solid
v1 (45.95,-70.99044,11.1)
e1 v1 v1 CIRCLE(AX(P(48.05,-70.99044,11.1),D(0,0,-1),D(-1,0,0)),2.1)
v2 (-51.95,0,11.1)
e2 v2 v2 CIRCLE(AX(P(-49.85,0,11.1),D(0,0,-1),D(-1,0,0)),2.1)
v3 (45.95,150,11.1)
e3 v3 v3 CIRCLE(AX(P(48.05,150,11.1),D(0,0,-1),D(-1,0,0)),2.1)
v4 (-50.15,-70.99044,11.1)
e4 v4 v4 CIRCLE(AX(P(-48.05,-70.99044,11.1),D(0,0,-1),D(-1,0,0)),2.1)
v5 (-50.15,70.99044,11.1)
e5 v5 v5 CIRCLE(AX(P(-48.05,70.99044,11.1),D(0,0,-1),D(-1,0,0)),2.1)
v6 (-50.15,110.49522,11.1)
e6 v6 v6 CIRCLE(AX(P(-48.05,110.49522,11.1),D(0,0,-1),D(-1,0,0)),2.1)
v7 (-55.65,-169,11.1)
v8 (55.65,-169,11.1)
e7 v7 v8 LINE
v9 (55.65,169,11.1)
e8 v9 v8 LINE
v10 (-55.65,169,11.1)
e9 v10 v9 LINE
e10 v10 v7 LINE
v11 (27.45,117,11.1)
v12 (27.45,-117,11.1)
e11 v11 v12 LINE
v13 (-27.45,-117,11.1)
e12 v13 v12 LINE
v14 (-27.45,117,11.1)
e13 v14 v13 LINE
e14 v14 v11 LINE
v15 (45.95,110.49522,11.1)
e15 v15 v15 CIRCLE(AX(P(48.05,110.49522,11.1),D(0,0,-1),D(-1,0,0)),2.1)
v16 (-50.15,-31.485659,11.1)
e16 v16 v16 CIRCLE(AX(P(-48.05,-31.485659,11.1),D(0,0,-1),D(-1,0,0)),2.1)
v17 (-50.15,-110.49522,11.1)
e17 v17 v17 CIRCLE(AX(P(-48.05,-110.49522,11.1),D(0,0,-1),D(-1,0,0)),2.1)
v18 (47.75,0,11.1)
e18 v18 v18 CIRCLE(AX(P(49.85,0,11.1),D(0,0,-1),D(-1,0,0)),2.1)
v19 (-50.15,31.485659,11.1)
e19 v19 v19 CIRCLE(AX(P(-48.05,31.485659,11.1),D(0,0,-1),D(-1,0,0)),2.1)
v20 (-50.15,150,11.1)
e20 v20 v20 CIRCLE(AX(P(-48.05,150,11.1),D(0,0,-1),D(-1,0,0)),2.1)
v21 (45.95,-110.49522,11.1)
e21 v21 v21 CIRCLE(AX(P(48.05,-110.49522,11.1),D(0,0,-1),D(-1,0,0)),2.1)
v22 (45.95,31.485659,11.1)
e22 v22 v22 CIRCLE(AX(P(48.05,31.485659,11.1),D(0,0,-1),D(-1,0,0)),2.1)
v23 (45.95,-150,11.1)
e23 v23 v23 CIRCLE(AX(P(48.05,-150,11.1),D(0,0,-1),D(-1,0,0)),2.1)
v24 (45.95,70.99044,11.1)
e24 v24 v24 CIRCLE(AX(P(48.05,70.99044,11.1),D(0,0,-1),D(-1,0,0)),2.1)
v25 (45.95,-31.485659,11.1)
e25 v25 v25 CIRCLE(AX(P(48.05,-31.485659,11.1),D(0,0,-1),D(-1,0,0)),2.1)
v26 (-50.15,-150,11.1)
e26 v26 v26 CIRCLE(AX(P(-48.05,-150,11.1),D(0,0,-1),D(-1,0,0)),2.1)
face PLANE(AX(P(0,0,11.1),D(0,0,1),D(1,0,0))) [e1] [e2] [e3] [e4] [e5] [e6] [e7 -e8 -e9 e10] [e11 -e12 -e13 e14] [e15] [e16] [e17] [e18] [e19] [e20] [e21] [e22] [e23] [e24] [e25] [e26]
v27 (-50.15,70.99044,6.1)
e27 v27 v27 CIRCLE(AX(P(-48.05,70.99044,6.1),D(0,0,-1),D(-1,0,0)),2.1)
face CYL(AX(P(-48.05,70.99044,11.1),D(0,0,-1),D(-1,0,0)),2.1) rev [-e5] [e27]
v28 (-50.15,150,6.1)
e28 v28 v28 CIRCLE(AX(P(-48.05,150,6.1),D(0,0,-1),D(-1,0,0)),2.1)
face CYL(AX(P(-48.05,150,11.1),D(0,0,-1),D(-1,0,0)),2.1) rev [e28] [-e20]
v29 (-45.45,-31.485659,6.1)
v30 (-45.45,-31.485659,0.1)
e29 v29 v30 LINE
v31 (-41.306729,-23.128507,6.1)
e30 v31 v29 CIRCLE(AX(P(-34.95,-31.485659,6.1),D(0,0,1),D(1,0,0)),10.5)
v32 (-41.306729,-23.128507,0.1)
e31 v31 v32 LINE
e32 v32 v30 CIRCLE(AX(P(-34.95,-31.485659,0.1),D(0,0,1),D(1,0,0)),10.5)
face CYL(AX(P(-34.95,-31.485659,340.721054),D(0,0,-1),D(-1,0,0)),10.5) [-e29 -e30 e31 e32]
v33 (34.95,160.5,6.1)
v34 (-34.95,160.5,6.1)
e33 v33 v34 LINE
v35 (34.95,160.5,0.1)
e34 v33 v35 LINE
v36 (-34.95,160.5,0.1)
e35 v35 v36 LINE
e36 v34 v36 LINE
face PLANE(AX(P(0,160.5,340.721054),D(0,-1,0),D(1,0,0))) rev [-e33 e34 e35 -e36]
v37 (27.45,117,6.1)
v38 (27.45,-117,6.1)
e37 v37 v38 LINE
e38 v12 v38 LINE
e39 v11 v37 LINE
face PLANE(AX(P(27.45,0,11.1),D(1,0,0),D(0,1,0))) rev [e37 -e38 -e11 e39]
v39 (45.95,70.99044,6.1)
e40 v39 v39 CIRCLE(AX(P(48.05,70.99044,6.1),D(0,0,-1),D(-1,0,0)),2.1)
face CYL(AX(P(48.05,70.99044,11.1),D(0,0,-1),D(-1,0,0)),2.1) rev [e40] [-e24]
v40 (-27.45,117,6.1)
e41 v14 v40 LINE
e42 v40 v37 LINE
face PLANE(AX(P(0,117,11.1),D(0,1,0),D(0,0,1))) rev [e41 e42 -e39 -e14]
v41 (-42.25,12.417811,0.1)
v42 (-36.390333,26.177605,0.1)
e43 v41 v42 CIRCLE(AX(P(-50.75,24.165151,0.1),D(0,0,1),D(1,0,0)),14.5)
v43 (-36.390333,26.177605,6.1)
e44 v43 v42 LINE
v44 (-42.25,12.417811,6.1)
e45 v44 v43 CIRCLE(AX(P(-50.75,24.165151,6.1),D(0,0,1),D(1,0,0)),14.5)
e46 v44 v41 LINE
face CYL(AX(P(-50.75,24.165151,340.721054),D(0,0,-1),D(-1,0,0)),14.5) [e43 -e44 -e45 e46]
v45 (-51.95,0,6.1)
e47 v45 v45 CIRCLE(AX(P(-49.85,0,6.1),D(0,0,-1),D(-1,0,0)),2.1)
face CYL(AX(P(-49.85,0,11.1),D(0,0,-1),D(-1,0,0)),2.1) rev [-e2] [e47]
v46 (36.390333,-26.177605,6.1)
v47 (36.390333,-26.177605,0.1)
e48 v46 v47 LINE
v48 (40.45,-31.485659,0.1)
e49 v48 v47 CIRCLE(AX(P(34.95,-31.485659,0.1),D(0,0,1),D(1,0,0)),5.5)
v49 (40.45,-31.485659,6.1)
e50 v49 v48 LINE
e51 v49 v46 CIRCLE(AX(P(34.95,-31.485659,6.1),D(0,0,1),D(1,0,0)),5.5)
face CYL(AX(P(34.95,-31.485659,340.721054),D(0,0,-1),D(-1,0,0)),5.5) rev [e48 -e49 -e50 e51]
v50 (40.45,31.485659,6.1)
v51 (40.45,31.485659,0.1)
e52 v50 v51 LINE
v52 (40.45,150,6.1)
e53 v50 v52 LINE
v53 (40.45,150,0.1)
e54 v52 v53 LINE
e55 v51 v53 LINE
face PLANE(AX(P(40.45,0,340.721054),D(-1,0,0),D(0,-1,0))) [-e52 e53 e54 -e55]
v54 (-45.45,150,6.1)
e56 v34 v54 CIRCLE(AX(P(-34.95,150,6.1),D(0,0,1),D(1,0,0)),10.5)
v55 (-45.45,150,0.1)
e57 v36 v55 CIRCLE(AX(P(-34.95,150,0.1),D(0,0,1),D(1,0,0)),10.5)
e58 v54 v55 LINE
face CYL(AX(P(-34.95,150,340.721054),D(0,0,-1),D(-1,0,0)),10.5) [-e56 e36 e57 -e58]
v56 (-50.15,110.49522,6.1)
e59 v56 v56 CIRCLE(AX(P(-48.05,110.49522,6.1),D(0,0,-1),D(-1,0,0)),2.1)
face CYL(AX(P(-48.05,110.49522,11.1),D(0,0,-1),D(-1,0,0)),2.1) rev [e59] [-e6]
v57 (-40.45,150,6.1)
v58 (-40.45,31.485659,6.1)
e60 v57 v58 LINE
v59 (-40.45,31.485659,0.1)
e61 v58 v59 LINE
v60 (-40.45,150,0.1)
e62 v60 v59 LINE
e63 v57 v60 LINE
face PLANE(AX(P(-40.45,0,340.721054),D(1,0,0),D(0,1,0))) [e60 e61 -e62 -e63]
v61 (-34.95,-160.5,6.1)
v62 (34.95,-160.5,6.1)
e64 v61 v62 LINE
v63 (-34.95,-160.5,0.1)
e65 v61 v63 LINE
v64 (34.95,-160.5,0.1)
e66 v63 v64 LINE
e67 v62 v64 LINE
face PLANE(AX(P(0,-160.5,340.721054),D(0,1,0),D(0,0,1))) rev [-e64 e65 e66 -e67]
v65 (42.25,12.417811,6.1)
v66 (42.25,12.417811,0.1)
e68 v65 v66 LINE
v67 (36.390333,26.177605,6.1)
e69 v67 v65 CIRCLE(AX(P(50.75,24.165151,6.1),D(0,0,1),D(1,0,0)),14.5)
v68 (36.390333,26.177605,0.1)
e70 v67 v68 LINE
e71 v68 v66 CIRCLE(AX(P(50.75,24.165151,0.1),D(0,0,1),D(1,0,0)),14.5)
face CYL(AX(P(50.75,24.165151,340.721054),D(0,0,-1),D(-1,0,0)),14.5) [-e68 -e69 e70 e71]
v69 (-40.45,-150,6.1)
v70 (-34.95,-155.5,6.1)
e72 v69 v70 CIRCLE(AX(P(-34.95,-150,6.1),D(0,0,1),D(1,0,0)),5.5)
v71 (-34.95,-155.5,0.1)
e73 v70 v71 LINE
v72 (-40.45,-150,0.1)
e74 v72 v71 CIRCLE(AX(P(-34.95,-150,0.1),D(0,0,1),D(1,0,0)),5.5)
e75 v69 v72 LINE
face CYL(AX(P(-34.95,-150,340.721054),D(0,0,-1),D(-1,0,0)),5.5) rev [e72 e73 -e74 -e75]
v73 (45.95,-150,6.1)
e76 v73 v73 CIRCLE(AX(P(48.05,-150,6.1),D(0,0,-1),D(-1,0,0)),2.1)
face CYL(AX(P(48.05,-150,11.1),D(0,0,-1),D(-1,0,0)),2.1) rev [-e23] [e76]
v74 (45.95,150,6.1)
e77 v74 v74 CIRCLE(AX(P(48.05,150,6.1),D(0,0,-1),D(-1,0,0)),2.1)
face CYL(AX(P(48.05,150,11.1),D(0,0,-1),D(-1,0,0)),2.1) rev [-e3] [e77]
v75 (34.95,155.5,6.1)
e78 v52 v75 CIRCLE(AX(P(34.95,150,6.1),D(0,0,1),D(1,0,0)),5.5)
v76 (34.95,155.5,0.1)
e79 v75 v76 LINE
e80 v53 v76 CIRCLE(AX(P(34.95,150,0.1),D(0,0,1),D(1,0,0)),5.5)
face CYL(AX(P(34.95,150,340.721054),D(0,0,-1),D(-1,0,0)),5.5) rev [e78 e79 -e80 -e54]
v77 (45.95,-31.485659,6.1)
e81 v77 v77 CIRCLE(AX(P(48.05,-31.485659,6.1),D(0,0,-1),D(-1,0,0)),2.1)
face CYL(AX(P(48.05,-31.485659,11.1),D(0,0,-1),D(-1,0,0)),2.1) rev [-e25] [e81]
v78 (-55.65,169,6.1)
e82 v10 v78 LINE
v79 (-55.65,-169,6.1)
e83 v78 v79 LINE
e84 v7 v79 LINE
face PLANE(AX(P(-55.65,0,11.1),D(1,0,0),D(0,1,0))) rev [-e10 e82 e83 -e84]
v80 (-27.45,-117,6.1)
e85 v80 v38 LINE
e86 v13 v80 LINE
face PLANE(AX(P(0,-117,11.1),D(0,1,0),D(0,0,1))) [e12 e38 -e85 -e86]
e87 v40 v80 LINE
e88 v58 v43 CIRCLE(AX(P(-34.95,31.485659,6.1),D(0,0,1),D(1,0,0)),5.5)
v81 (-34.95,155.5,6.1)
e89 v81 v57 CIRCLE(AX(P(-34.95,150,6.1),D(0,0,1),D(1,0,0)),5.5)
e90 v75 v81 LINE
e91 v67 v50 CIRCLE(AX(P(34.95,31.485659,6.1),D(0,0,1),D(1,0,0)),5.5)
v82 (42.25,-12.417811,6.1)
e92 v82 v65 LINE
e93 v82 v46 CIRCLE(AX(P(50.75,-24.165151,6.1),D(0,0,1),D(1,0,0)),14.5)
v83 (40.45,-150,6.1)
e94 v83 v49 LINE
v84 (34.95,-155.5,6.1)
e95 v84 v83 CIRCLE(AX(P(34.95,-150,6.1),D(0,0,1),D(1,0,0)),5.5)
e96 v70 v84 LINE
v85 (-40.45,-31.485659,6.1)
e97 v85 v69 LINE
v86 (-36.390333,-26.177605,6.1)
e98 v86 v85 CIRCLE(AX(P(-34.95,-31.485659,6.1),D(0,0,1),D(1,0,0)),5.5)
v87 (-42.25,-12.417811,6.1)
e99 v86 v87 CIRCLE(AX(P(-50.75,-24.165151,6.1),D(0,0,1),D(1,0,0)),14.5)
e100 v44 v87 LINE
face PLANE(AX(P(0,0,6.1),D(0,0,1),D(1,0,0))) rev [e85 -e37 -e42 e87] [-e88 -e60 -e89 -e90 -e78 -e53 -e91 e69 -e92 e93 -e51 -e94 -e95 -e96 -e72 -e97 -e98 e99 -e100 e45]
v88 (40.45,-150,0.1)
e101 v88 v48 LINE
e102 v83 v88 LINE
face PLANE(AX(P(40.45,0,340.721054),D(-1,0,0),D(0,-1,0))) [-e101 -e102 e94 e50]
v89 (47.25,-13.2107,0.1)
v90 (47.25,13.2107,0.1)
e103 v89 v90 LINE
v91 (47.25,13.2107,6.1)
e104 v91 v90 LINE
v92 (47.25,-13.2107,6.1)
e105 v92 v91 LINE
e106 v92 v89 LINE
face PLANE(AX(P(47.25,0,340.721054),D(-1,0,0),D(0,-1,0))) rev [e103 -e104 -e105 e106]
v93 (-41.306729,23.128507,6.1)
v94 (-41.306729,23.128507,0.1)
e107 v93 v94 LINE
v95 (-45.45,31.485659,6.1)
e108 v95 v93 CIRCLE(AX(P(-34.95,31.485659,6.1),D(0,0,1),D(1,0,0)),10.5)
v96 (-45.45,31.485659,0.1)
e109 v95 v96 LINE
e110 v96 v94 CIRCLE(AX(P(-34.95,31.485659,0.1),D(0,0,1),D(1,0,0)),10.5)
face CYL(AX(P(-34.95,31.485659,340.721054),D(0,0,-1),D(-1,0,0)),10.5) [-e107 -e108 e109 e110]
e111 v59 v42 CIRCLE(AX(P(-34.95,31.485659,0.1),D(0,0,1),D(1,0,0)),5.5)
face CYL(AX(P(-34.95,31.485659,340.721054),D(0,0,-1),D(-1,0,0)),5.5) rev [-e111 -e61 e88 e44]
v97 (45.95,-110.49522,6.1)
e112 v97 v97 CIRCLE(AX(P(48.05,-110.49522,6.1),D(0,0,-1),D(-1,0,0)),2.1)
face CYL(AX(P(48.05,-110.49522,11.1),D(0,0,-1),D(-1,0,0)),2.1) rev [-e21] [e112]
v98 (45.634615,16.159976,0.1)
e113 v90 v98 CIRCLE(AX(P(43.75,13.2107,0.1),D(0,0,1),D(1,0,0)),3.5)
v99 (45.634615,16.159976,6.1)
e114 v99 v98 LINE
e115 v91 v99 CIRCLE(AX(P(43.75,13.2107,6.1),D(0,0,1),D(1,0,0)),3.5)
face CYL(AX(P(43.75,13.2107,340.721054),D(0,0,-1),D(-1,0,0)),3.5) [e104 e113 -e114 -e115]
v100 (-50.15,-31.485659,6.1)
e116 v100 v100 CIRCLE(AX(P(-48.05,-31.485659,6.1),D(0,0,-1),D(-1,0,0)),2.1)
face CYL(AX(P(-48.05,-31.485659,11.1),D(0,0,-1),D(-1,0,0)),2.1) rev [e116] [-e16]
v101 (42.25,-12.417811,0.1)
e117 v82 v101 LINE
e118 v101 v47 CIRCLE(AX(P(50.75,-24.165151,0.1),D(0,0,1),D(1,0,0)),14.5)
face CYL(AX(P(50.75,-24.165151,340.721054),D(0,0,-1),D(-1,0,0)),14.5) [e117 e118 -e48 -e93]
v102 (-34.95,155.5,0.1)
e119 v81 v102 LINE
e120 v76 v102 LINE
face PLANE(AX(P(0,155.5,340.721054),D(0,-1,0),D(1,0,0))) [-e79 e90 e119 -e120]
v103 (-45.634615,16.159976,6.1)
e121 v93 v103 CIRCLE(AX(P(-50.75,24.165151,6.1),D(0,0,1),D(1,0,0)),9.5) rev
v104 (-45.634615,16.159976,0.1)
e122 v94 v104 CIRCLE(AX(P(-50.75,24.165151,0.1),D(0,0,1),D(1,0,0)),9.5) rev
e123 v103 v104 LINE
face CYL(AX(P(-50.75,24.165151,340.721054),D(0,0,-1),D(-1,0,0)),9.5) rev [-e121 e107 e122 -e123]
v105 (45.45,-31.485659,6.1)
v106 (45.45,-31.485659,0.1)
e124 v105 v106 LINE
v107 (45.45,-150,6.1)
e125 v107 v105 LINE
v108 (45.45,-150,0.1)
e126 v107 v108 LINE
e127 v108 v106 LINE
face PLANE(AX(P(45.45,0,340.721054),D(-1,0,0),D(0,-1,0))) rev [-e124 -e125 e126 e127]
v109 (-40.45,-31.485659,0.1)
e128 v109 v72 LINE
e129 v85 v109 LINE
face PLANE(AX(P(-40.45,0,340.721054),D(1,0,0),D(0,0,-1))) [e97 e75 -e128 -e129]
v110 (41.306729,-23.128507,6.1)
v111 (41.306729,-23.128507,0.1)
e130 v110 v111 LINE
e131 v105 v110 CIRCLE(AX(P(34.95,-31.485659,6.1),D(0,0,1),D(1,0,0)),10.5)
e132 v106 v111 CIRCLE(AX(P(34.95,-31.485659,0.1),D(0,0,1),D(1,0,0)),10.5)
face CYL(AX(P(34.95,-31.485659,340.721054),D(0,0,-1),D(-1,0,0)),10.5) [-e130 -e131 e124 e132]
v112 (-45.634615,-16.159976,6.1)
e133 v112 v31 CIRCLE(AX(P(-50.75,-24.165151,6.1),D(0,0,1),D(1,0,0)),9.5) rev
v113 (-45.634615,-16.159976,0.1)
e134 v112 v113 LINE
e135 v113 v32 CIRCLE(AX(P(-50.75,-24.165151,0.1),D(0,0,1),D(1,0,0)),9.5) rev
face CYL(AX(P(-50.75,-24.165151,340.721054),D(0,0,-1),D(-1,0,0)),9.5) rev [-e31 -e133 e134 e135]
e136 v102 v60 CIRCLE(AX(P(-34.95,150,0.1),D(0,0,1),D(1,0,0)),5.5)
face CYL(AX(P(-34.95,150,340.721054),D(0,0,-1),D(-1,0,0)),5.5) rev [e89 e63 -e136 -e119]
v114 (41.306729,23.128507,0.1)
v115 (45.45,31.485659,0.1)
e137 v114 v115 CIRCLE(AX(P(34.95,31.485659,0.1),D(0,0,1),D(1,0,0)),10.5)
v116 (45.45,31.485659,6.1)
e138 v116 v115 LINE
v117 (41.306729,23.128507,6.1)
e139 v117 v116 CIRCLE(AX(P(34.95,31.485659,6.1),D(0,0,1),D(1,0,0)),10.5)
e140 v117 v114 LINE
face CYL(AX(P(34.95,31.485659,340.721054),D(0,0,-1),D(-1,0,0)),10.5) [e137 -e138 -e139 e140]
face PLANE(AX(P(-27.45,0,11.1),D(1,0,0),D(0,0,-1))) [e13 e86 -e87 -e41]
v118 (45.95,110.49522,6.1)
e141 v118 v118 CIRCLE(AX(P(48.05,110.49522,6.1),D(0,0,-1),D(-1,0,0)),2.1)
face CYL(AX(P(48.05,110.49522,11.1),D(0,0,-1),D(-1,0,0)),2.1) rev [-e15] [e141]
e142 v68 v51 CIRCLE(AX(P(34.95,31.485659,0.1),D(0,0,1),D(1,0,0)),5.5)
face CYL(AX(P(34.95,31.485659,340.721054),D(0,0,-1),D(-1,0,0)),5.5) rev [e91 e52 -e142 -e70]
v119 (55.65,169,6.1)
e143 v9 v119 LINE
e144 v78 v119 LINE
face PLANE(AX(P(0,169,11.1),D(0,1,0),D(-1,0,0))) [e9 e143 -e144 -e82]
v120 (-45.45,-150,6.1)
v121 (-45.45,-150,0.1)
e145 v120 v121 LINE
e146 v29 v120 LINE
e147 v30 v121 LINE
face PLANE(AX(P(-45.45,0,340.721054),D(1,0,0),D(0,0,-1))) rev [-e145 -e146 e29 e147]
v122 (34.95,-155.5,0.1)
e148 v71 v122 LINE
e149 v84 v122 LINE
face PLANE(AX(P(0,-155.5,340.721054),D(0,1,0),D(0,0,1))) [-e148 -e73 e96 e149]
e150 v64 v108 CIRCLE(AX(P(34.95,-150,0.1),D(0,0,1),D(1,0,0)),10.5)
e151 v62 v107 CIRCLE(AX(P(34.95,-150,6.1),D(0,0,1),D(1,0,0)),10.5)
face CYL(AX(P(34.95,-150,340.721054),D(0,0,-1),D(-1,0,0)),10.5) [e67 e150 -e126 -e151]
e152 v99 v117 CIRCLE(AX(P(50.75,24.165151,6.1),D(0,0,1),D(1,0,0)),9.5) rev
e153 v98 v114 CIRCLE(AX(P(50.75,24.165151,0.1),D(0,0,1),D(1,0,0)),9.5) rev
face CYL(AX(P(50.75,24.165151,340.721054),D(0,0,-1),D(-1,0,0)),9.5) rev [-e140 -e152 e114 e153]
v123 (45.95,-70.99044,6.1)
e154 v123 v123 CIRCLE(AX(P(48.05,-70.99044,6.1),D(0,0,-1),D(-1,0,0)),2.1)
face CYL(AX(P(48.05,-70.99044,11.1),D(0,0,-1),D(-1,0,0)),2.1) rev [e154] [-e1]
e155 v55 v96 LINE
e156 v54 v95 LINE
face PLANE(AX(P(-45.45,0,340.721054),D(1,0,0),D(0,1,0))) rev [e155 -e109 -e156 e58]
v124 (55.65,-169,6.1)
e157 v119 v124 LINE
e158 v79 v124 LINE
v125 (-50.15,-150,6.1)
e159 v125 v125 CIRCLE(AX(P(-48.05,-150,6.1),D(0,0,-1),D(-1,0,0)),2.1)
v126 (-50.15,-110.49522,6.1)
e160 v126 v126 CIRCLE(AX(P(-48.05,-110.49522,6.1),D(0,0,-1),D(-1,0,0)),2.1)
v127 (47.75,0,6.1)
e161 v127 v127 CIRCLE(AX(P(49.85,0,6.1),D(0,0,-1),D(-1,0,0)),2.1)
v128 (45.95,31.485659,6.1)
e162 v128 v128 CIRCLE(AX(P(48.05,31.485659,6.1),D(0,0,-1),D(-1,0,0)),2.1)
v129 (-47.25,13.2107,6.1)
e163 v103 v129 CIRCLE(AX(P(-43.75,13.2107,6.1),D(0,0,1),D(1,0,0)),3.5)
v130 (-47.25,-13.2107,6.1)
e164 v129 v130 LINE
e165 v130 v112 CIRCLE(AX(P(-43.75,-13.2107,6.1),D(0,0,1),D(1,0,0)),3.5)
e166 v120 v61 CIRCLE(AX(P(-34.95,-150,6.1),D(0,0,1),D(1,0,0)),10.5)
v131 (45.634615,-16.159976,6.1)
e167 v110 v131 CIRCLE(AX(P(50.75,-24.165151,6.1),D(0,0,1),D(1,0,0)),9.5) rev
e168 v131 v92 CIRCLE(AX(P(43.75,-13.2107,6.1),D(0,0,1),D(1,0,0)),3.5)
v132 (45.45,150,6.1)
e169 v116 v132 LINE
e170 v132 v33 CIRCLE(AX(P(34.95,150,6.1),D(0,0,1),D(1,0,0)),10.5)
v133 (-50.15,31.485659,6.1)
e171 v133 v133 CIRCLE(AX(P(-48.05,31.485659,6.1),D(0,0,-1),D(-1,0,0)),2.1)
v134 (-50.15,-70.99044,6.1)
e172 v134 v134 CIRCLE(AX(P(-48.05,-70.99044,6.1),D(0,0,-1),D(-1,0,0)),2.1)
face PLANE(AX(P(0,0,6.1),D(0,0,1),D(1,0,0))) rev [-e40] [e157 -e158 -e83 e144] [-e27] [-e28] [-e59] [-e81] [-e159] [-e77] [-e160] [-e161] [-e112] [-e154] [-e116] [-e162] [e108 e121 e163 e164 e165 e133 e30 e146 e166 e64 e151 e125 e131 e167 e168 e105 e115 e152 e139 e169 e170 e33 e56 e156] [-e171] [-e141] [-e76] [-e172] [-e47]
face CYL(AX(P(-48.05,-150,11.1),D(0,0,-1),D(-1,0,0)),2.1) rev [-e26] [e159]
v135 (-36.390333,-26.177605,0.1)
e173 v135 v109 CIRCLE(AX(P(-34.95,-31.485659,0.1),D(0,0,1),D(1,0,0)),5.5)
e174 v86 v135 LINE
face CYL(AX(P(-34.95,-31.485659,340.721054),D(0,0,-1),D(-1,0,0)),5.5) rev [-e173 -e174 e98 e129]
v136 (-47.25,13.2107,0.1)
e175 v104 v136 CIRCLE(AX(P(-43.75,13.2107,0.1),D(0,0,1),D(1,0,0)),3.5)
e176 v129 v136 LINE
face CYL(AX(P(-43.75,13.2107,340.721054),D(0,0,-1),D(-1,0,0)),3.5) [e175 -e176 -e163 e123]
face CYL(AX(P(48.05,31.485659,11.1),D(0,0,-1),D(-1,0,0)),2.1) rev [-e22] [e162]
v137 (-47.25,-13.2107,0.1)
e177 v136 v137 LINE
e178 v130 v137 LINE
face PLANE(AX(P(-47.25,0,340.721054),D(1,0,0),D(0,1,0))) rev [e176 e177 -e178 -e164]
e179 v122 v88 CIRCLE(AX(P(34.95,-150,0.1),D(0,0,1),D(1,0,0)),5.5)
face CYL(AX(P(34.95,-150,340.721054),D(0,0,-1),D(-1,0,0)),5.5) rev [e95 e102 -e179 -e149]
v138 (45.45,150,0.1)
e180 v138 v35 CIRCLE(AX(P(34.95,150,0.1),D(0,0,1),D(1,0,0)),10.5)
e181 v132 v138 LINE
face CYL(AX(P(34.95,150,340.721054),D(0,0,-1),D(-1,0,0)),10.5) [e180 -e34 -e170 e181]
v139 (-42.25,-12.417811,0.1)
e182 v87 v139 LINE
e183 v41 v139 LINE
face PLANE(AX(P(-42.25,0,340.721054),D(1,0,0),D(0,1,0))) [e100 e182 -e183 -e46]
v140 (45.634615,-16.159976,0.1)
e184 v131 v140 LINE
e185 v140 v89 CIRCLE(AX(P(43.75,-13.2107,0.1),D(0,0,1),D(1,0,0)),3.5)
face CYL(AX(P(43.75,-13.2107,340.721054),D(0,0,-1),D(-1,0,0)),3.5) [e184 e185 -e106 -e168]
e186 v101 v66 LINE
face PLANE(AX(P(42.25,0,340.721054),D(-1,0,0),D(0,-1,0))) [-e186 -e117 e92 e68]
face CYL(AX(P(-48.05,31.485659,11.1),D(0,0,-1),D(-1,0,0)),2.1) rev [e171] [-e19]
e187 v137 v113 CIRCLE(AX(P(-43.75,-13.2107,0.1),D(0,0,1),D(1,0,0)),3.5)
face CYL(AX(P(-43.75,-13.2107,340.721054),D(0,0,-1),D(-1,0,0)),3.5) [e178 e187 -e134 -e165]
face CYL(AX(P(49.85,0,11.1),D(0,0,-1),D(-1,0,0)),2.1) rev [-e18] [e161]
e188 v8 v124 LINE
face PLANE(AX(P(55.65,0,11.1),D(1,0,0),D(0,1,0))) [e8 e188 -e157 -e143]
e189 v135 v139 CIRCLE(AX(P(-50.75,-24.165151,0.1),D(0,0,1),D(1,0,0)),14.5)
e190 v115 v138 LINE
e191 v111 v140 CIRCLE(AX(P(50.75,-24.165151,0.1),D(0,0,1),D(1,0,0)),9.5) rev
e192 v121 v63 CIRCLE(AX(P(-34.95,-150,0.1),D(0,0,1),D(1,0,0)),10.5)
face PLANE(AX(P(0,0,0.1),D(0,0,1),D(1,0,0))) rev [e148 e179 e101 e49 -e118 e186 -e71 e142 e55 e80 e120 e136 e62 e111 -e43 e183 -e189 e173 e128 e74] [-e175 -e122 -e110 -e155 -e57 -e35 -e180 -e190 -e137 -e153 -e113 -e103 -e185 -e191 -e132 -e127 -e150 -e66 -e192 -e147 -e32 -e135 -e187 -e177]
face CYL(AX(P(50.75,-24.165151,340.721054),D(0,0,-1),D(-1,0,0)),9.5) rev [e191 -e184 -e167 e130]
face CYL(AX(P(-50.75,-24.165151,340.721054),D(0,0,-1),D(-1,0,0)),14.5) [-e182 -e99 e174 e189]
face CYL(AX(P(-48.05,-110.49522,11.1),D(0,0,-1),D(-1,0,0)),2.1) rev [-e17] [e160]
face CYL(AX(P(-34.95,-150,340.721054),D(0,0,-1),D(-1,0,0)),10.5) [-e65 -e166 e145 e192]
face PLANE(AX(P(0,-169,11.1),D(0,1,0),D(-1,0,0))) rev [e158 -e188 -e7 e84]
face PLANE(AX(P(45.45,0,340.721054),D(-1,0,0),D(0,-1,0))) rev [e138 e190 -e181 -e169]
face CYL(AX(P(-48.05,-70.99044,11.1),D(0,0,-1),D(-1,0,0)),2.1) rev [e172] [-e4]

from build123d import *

# Parameters (mm, degrees)
BOSS_EXTRUDE1_DEPTH = 6
BOSS_EXTRUDE2_START = 6
SKETCH1_W           = 111.3
SKETCH1_H           = 338
SKETCH1_R           = 2.1
SKETCH1_W_2         = 54.9
SKETCH1_H_2         = 234
BOSS_EXTRUDE2_DEPTH = 5


with BuildPart() as part:
    # Sketch2 → Boss-Extrude1 (new body)
    with BuildSketch(Plane.XY.offset(0.1)):
        with BuildLine():
            ThreePointArc((-47.25, -13.21070024), (-46.819703068, -14.892045855), (-45.634615385, -16.159975549))
            ThreePointArc((-45.634615385, -16.159975549), (-42.679763233, -19.15303821), (-41.306728934, -23.128507005))
            ThreePointArc((-41.306728934, -23.128507005), (-44.357328362, -26.821736965), (-45.45, -31.485659466))
            Line((-45.45, -31.485659466), (-45.45, -150))
            ThreePointArc((-45.45, -150), (-42.374621202, -157.424621202), (-34.95, -160.5))
            Line((-34.95, -160.5), (34.95, -160.5))
            ThreePointArc((34.95, -160.5), (42.374621202, -157.424621202), (45.45, -150))
            Line((45.45, -150), (45.45, -31.485659466))
            ThreePointArc((45.45, -31.485659466), (44.357328362, -26.821736965), (41.306728934, -23.128507005))
            ThreePointArc((41.306728934, -23.128507005), (42.679763233, -19.15303821), (45.634615385, -16.159975549))
            ThreePointArc((45.634615385, -16.159975549), (46.819703068, -14.892045855), (47.25, -13.21070024))
            Line((47.25, -13.21070024), (47.25, 13.21070024))
            ThreePointArc((47.25, 13.21070024), (46.819703068, 14.892045855), (45.634615385, 16.159975549))
            ThreePointArc((45.634615385, 16.159975549), (42.679763233, 19.15303821), (41.306728934, 23.128507005))
            ThreePointArc((41.306728934, 23.128507005), (44.357328362, 26.821736965), (45.45, 31.485659466))
            Line((45.45, 31.485659466), (45.45, 150))
            ThreePointArc((45.45, 150), (42.374621202, 157.424621202), (34.95, 160.5))
            Line((34.95, 160.5), (-34.95, 160.5))
            ThreePointArc((-34.95, 160.5), (-42.374621202, 157.424621202), (-45.45, 150))
            Line((-45.45, 150), (-45.45, 31.485659466))
            ThreePointArc((-45.45, 31.485659466), (-44.357328362, 26.821736965), (-41.306728934, 23.128507005))
            ThreePointArc((-41.306728934, 23.128507005), (-42.679763233, 19.15303821), (-45.634615385, 16.159975549))
            ThreePointArc((-45.634615385, 16.159975549), (-46.819703068, 14.892045855), (-47.25, 13.21070024))
            Line((-47.25, 13.21070024), (-47.25, -13.21070024))
        make_face()
        with BuildLine():
            ThreePointArc((-40.45, 31.485659466), (-39.318743113, 28.144389705), (-36.390333232, 26.177605191))
            ThreePointArc((-36.390333232, 26.177605191), (-37.409307611, 18.483960794), (-42.25, 12.417811265))
            Line((-42.25, 12.417811265), (-42.25, -12.417811265))
            ThreePointArc((-42.25, -12.417811265), (-37.409307611, -18.483960794), (-36.390333232, -26.177605191))
            ThreePointArc((-36.390333232, -26.177605191), (-39.318743113, -28.144389705), (-40.45, -31.485659466))
            Line((-40.45, -31.485659466), (-40.45, -150))
            ThreePointArc((-40.45, -150), (-38.839087297, -153.889087297), (-34.95, -155.5))
            Line((-34.95, -155.5), (34.95, -155.5))
            ThreePointArc((34.95, -155.5), (38.839087297, -153.889087297), (40.45, -150))
            Line((40.45, -150), (40.45, -31.485659466))
            ThreePointArc((40.45, -31.485659466), (39.318743113, -28.144389705), (36.390333232, -26.177605191))
            ThreePointArc((36.390333232, -26.177605191), (37.409307611, -18.483960794), (42.25, -12.417811265))
            Line((42.25, -12.417811265), (42.25, 12.417811265))
            ThreePointArc((42.25, 12.417811265), (37.409307611, 18.483960794), (36.390333232, 26.177605191))
            ThreePointArc((36.390333232, 26.177605191), (39.318743113, 28.144389705), (40.45, 31.485659466))
            Line((40.45, 31.485659466), (40.45, 150))
            ThreePointArc((40.45, 150), (38.839087297, 153.889087297), (34.95, 155.5))
            Line((34.95, 155.5), (-34.95, 155.5))
            ThreePointArc((-34.95, 155.5), (-38.839087297, 153.889087297), (-40.45, 150))
            Line((-40.45, 150), (-40.45, 31.485659466))
        make_face(mode=Mode.SUBTRACT)
    extrude(amount=BOSS_EXTRUDE1_DEPTH)

    # Sketch1 → Boss-Extrude2 (add)
    with BuildSketch(Plane.XY.offset(0.1).offset(BOSS_EXTRUDE2_START)):
        Rectangle(SKETCH1_W, SKETCH1_H)
        with Locations(Location((49.85, 0, 0), (0, 0, 180))):
            Circle(SKETCH1_R, mode=Mode.SUBTRACT)
        with Locations(Location((48.05, -70.990439644, 0), (0, 0, 180))):
            Circle(SKETCH1_R, mode=Mode.SUBTRACT)
        with Locations(Location((48.05, -110.495219822, 0), (0, 0, 180))):
            Circle(SKETCH1_R, mode=Mode.SUBTRACT)
        with Locations(Location((48.05, -150, 0), (0, 0, 180))):
            Circle(SKETCH1_R, mode=Mode.SUBTRACT)
        with Locations(Location((-48.05, -150, 0), (0, 0, 180))):
            Circle(SKETCH1_R, mode=Mode.SUBTRACT)
        with Locations(Location((-48.05, -110.495219822, 0), (0, 0, 180))):
            Circle(SKETCH1_R, mode=Mode.SUBTRACT)
        with Locations(Location((-48.05, -70.990439644, 0), (0, 0, 180))):
            Circle(SKETCH1_R, mode=Mode.SUBTRACT)
        with Locations(Location((-48.05, 150, 0), (0, 0, 180))):
            Circle(SKETCH1_R, mode=Mode.SUBTRACT)
        with Locations(Location((48.05, 150, 0), (0, 0, 180))):
            Circle(SKETCH1_R, mode=Mode.SUBTRACT)
        with Locations(Location((48.05, 110.495219822, 0), (0, 0, 180))):
            Circle(SKETCH1_R, mode=Mode.SUBTRACT)
        with Locations(Location((-48.05, 110.495219822, 0), (0, 0, 180))):
            Circle(SKETCH1_R, mode=Mode.SUBTRACT)
        with Locations(Location((-48.05, 70.990439644, 0), (0, 0, 180))):
            Circle(SKETCH1_R, mode=Mode.SUBTRACT)
        with Locations(Location((-48.05, 31.485659466, 0), (0, 0, 180))):
            Circle(SKETCH1_R, mode=Mode.SUBTRACT)
        with Locations(Location((48.05, 70.990439644, 0), (0, 0, 180))):
            Circle(SKETCH1_R, mode=Mode.SUBTRACT)
        with Locations(Location((48.05, 31.485659466, 0), (0, 0, 180))):
            Circle(SKETCH1_R, mode=Mode.SUBTRACT)
        with Locations(Location((-49.85, 0, 0), (0, 0, 180))):
            Circle(SKETCH1_R, mode=Mode.SUBTRACT)
        with Locations(Location((-48.05, -31.485659466, 0), (0, 0, 180))):
            Circle(SKETCH1_R, mode=Mode.SUBTRACT)
        with Locations(Location((48.05, -31.485659466, 0), (0, 0, 180))):
            Circle(SKETCH1_R, mode=Mode.SUBTRACT)
        Rectangle(SKETCH1_W_2, SKETCH1_H_2, mode=Mode.SUBTRACT)
    extrude(amount=BOSS_EXTRUDE2_DEPTH)


solid = part.part
